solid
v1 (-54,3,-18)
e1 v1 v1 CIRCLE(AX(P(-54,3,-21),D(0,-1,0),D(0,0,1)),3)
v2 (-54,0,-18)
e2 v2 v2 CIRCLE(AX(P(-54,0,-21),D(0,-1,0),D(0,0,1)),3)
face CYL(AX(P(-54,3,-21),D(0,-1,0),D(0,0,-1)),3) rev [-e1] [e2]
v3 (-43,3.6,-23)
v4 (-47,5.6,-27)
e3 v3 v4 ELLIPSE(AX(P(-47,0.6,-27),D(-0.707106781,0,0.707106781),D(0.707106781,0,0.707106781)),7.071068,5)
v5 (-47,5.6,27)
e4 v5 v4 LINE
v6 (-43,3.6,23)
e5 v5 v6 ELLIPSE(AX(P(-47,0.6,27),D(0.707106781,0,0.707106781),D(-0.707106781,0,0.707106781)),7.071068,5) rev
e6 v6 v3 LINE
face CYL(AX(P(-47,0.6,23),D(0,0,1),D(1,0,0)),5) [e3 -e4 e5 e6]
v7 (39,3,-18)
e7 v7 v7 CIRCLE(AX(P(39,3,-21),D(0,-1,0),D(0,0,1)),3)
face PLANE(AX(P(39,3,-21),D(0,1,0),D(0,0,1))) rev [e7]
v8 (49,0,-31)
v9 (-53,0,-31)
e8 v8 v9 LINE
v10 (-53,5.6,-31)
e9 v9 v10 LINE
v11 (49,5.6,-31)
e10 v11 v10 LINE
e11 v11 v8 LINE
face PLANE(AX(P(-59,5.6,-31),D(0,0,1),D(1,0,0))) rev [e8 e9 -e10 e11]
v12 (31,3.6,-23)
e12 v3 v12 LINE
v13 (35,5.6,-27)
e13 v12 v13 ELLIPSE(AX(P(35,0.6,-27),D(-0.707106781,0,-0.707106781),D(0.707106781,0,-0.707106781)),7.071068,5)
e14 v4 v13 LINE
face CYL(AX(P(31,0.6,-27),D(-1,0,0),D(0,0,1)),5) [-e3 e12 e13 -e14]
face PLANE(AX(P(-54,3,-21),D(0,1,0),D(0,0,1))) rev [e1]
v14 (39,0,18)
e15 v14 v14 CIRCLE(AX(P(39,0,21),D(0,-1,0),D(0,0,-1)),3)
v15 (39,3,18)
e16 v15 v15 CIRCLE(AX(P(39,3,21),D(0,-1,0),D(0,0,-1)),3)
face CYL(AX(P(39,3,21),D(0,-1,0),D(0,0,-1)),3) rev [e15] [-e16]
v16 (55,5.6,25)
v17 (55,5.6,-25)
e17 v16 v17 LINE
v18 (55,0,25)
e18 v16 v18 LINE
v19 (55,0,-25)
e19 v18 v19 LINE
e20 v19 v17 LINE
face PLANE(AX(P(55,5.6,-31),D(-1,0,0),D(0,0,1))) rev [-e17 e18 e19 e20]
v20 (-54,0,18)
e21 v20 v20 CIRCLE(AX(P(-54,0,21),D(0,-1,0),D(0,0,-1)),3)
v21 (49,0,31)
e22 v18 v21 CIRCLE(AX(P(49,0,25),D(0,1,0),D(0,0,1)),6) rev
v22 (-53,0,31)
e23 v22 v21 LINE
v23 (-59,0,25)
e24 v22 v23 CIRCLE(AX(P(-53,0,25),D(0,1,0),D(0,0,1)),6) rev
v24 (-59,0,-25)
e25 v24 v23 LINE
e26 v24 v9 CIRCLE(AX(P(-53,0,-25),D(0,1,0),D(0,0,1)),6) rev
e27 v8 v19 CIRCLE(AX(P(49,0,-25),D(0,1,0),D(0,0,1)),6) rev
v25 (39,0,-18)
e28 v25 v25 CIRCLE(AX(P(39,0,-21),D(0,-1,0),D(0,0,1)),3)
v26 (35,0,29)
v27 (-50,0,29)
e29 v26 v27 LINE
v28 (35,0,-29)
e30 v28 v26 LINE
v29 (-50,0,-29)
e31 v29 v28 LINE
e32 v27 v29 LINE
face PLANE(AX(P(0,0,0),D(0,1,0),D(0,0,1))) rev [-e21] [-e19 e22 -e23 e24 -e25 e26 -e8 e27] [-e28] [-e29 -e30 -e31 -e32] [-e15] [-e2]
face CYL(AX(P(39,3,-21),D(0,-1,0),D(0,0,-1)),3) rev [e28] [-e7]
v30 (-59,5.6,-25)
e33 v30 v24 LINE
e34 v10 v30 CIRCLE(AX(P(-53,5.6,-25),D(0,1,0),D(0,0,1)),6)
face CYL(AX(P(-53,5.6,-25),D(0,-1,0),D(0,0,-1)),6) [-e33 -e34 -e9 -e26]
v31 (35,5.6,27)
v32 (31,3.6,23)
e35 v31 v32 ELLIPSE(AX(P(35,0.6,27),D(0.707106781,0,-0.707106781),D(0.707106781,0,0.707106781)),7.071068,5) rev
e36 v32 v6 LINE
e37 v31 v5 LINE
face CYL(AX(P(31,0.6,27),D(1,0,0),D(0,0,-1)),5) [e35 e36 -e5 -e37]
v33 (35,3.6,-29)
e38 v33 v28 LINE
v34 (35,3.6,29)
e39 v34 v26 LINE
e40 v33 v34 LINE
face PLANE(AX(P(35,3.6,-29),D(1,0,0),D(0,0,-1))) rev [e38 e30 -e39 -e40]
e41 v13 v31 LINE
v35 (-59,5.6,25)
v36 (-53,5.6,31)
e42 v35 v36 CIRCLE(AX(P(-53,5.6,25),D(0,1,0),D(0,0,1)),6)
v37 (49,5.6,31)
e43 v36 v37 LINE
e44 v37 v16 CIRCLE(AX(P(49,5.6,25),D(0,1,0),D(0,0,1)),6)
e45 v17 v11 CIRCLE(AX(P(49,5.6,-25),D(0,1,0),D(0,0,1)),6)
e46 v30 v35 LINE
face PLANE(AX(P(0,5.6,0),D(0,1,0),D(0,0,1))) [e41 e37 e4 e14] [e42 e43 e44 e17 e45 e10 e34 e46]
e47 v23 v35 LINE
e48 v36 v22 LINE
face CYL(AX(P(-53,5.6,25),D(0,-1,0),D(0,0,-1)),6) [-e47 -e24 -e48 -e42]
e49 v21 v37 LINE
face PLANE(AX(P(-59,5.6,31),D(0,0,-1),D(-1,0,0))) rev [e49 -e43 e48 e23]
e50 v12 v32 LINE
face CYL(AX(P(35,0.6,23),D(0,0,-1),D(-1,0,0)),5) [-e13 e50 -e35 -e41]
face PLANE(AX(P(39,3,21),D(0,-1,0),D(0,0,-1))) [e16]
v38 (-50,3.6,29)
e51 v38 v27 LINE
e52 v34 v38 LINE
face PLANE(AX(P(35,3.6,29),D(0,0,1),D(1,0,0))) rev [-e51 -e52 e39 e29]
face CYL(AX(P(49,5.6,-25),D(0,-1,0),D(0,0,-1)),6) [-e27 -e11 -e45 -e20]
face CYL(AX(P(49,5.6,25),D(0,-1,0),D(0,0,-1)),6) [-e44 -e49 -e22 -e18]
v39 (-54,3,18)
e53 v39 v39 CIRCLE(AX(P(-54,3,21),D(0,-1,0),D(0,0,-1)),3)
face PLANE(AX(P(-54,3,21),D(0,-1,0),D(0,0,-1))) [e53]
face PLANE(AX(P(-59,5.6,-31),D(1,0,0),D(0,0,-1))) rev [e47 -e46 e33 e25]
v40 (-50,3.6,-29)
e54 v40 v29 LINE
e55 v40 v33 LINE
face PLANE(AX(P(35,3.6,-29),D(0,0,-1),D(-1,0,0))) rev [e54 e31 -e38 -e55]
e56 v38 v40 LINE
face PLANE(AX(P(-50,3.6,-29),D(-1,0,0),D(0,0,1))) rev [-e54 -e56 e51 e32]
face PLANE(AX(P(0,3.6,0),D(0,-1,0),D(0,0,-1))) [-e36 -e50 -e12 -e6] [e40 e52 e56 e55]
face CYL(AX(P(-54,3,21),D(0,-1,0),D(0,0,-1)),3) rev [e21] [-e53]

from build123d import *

# Parameters (mm, degrees)
SKETCH_1_W            = 114
SKETCH_1_H            = 62
EXTRUDE_1_DEPTH       = 5.6
SKETCH_5_R            = 3
CUT_EXTRUDE_865_DEPTH = 3
SKETCH_7_W            = 85
SKETCH_7_H            = 58
LCD_DEPTH             = 3.6
SKETCH_13_W           = 74
SKETCH_13_H           = 46
CUT_EXTRUDE_1_DEPTH   = 10
FILLET_2_R            = 5
FILLET_3_R            = 6


with BuildPart() as part:
    # Эскиз1 → Бобышка-Вытянуть1 (new body)
    with BuildSketch(Plane(origin=(0, 0, 0), x_dir=(1, 0, 0), z_dir=(0, 1, 0))):
        with Locations((-2, 0)):
            Rectangle(SKETCH_1_W, SKETCH_1_H)
    extrude(amount=EXTRUDE_1_DEPTH)

    # Эскиз5 → Cut-Extrude 865 (cut)
    with BuildSketch(Plane.XZ):
        with Locations(Location((-54, 21, 0), (0, 0, 270))):
            Circle(SKETCH_5_R)
        with Locations(Location((-54, -21, 0), (0, 0, 90))):
            Circle(SKETCH_5_R)
        with Locations(Location((39, 21, 0), (0, 0, 270))):
            Circle(SKETCH_5_R)
        with Locations(Location((39, -21, 0), (0, 0, 90))):
            Circle(SKETCH_5_R)
    extrude(amount=-CUT_EXTRUDE_865_DEPTH, mode=Mode.SUBTRACT)

    # Эскиз7 → под LCD (cut)
    with BuildSketch(Plane.XZ):
        with Locations((-7.5, 0)):
            Rectangle(SKETCH_7_W, SKETCH_7_H)
    extrude(amount=-LCD_DEPTH, mode=Mode.SUBTRACT)

    # Эскиз13 → Вырез-Вытянуть1 (cut)
    with BuildSketch(Plane.XZ.offset(-3.6)):
        with Locations((-6, 0)):
            Rectangle(SKETCH_13_W, SKETCH_13_H)
    extrude(amount=-CUT_EXTRUDE_1_DEPTH, mode=Mode.SUBTRACT)

    # Скругление2
    # the kernel refuses this fillet: 5 mm, written as the material it takes off along each edge
    with BuildSketch(Plane(origin=(-43, 5.6, 23), x_dir=(-1, 0, 0), z_dir=(0, 0, -1)), Plane(origin=(31, 5.6, -23), x_dir=(1, 0, 0), z_dir=(0, 0, 1))) as fillet_2_piece_1:
        with BuildLine():
            CenterArc((4, -5), FILLET_2_R, 90, 53.130102354)
            Line((0, -2), (-0.08, -1.94))
            ThreePointArc((-0.08, -1.94), (-0.1, -1), (-0.1, 0))
            Line((-0.1, 0), (0, 0.1))
            Line((0, 0.1), (4, 0.1))
            Line((4, 0.1), (4, 0))
        make_face()
    extrude(amount=46, mode=Mode.SUBTRACT)
    with BuildSketch(Plane(origin=(31, 5.6, 23), x_dir=(0, 0, 1), z_dir=(-1, 0, 0)), Plane(origin=(-43, 5.6, -23), x_dir=(0, 0, -1), z_dir=(1, 0, 0))) as fillet_2_piece_2:
        with BuildLine():
            CenterArc((4, -5), FILLET_2_R, 90, 53.130102354)
            Line((0, -2), (-0.08, -1.94))
            ThreePointArc((-0.08, -1.94), (-0.1, -1), (-0.1, 0))
            Line((-0.1, 0), (0, 0.1))
            Line((0, 0.1), (4, 0.1))
            Line((4, 0.1), (4, 0))
        make_face()
    extrude(amount=74, mode=Mode.SUBTRACT)
    with BuildSketch(Plane(origin=(31, 5.6, 23), x_dir=(0, 0, 1), z_dir=(-1, 0, 0))) as fillet_2_piece_3a_section:
        with BuildLine():
            CenterArc((4, -5), FILLET_2_R, 90, 53.130102354)
            Line((0, -2), (-0.08, -1.94))
            ThreePointArc((-0.08, -1.94), (-0.1, -1), (-0.1, 0))
            Line((-0.1, 0), (0, 0.1))
            Line((0, 0.1), (4, 0.1))
            Line((4, 0.1), (4, 0))
        make_face()
    fillet_2_piece_3a = extrude(amount=84, mode=Mode.PRIVATE)
    fillet_2_piece_3a = split(fillet_2_piece_3a, bisect_by=Plane(origin=(-43, 5.088057438, 24.029417057), z_dir=(-1, 0, 0)), keep=Keep.TOP, mode=Mode.PRIVATE)
    with BuildSketch(Plane(origin=(-43, 5.6, 33), x_dir=(-1, 0, 0), z_dir=(0, 0, -1))) as fillet_2_piece_3b_section:
        with BuildLine():
            CenterArc((4, -5), FILLET_2_R, 90, 53.130102354)
            Line((0, -2), (-0.08, -1.94))
            ThreePointArc((-0.08, -1.94), (-0.1, -1), (-0.1, 0))
            Line((-0.1, 0), (0, 0.1))
            Line((0, 0.1), (4, 0.1))
            Line((4, 0.1), (4, 0))
        make_face()
    fillet_2_piece_3b = extrude(amount=56, mode=Mode.PRIVATE)
    fillet_2_piece_3b = split(fillet_2_piece_3b, bisect_by=Plane(origin=(-44.029417057, 5.088057438, 23), z_dir=(0, 0, 1)), keep=Keep.TOP, mode=Mode.PRIVATE)
    fillet_2_piece_3 = fillet_2_piece_3a & fillet_2_piece_3b
    add(fillet_2_piece_3, mode=Mode.SUBTRACT)
    with BuildSketch(Plane(origin=(-43, 5.6, 23), x_dir=(-1, 0, 0), z_dir=(0, 0, -1))) as fillet_2_piece_4a_section:
        with BuildLine():
            CenterArc((4, -5), FILLET_2_R, 90, 53.130102354)
            Line((0, -2), (-0.08, -1.94))
            ThreePointArc((-0.08, -1.94), (-0.1, -1), (-0.1, 0))
            Line((-0.1, 0), (0, 0.1))
            Line((0, 0.1), (4, 0.1))
            Line((4, 0.1), (4, 0))
        make_face()
    fillet_2_piece_4a = extrude(amount=56, mode=Mode.PRIVATE)
    fillet_2_piece_4a = split(fillet_2_piece_4a, bisect_by=Plane(origin=(-44.029417057, 5.088057438, -23), z_dir=(0, 0, -1)), keep=Keep.TOP, mode=Mode.PRIVATE)
    with BuildSketch(Plane(origin=(-53, 5.6, -23), x_dir=(0, 0, -1), z_dir=(1, 0, 0))) as fillet_2_piece_4b_section:
        with BuildLine():
            CenterArc((4, -5), FILLET_2_R, 90, 53.130102354)
            Line((0, -2), (-0.08, -1.94))
            ThreePointArc((-0.08, -1.94), (-0.1, -1), (-0.1, 0))
            Line((-0.1, 0), (0, 0.1))
            Line((0, 0.1), (4, 0.1))
            Line((4, 0.1), (4, 0))
        make_face()
    fillet_2_piece_4b = extrude(amount=84, mode=Mode.PRIVATE)
    fillet_2_piece_4b = split(fillet_2_piece_4b, bisect_by=Plane(origin=(-43, 5.088057438, -24.029417057), z_dir=(-1, 0, 0)), keep=Keep.TOP, mode=Mode.PRIVATE)
    fillet_2_piece_4 = fillet_2_piece_4a & fillet_2_piece_4b
    add(fillet_2_piece_4, mode=Mode.SUBTRACT)
    with BuildSketch(Plane(origin=(41, 5.6, 23), x_dir=(0, 0, 1), z_dir=(-1, 0, 0))) as fillet_2_piece_5a_section:
        with BuildLine():
            CenterArc((4, -5), FILLET_2_R, 90, 53.130102354)
            Line((0, -2), (-0.08, -1.94))
            ThreePointArc((-0.08, -1.94), (-0.1, -1), (-0.1, 0))
            Line((-0.1, 0), (0, 0.1))
            Line((0, 0.1), (4, 0.1))
            Line((4, 0.1), (4, 0))
        make_face()
    fillet_2_piece_5a = extrude(amount=84, mode=Mode.PRIVATE)
    fillet_2_piece_5a = split(fillet_2_piece_5a, bisect_by=Plane(origin=(31, 5.088057438, 24.029417057), z_dir=(1, 0, 0)), keep=Keep.TOP, mode=Mode.PRIVATE)
    with BuildSketch(Plane(origin=(31, 5.6, -23), x_dir=(1, 0, 0), z_dir=(0, 0, 1))) as fillet_2_piece_5b_section:
        with BuildLine():
            CenterArc((4, -5), FILLET_2_R, 90, 53.130102354)
            Line((0, -2), (-0.08, -1.94))
            ThreePointArc((-0.08, -1.94), (-0.1, -1), (-0.1, 0))
            Line((-0.1, 0), (0, 0.1))
            Line((0, 0.1), (4, 0.1))
            Line((4, 0.1), (4, 0))
        make_face()
    fillet_2_piece_5b = extrude(amount=56, mode=Mode.PRIVATE)
    fillet_2_piece_5b = split(fillet_2_piece_5b, bisect_by=Plane(origin=(32.029417057, 5.088057438, 23), z_dir=(0, 0, 1)), keep=Keep.TOP, mode=Mode.PRIVATE)
    fillet_2_piece_5 = fillet_2_piece_5a & fillet_2_piece_5b
    add(fillet_2_piece_5, mode=Mode.SUBTRACT)
    with BuildSketch(Plane(origin=(-43, 5.6, -23), x_dir=(0, 0, -1), z_dir=(1, 0, 0))) as fillet_2_piece_6a_section:
        with BuildLine():
            CenterArc((4, -5), FILLET_2_R, 90, 53.130102354)
            Line((0, -2), (-0.08, -1.94))
            ThreePointArc((-0.08, -1.94), (-0.1, -1), (-0.1, 0))
            Line((-0.1, 0), (0, 0.1))
            Line((0, 0.1), (4, 0.1))
            Line((4, 0.1), (4, 0))
        make_face()
    fillet_2_piece_6a = extrude(amount=84, mode=Mode.PRIVATE)
    fillet_2_piece_6a = split(fillet_2_piece_6a, bisect_by=Plane(origin=(31, 5.088057438, -24.029417057), z_dir=(1, 0, 0)), keep=Keep.TOP, mode=Mode.PRIVATE)
    with BuildSketch(Plane(origin=(31, 5.6, -33), x_dir=(1, 0, 0), z_dir=(0, 0, 1))) as fillet_2_piece_6b_section:
        with BuildLine():
            CenterArc((4, -5), FILLET_2_R, 90, 53.130102354)
            Line((0, -2), (-0.08, -1.94))
            ThreePointArc((-0.08, -1.94), (-0.1, -1), (-0.1, 0))
            Line((-0.1, 0), (0, 0.1))
            Line((0, 0.1), (4, 0.1))
            Line((4, 0.1), (4, 0))
        make_face()
    fillet_2_piece_6b = extrude(amount=56, mode=Mode.PRIVATE)
    fillet_2_piece_6b = split(fillet_2_piece_6b, bisect_by=Plane(origin=(32.029417057, 5.088057438, -23), z_dir=(0, 0, -1)), keep=Keep.TOP, mode=Mode.PRIVATE)
    fillet_2_piece_6 = fillet_2_piece_6a & fillet_2_piece_6b
    add(fillet_2_piece_6, mode=Mode.SUBTRACT)

    # Скругление3
    fillet_3_edges = [part.edges().sort_by_distance(p)[0] for p in [
        (55, 2.8, 31),
        (-59, 2.8, 31),
        (-59, 2.8, -31),
        (55, 2.8, -31),
    ]]
    fillet(fillet_3_edges, radius=FILLET_3_R)


solid = part.part
